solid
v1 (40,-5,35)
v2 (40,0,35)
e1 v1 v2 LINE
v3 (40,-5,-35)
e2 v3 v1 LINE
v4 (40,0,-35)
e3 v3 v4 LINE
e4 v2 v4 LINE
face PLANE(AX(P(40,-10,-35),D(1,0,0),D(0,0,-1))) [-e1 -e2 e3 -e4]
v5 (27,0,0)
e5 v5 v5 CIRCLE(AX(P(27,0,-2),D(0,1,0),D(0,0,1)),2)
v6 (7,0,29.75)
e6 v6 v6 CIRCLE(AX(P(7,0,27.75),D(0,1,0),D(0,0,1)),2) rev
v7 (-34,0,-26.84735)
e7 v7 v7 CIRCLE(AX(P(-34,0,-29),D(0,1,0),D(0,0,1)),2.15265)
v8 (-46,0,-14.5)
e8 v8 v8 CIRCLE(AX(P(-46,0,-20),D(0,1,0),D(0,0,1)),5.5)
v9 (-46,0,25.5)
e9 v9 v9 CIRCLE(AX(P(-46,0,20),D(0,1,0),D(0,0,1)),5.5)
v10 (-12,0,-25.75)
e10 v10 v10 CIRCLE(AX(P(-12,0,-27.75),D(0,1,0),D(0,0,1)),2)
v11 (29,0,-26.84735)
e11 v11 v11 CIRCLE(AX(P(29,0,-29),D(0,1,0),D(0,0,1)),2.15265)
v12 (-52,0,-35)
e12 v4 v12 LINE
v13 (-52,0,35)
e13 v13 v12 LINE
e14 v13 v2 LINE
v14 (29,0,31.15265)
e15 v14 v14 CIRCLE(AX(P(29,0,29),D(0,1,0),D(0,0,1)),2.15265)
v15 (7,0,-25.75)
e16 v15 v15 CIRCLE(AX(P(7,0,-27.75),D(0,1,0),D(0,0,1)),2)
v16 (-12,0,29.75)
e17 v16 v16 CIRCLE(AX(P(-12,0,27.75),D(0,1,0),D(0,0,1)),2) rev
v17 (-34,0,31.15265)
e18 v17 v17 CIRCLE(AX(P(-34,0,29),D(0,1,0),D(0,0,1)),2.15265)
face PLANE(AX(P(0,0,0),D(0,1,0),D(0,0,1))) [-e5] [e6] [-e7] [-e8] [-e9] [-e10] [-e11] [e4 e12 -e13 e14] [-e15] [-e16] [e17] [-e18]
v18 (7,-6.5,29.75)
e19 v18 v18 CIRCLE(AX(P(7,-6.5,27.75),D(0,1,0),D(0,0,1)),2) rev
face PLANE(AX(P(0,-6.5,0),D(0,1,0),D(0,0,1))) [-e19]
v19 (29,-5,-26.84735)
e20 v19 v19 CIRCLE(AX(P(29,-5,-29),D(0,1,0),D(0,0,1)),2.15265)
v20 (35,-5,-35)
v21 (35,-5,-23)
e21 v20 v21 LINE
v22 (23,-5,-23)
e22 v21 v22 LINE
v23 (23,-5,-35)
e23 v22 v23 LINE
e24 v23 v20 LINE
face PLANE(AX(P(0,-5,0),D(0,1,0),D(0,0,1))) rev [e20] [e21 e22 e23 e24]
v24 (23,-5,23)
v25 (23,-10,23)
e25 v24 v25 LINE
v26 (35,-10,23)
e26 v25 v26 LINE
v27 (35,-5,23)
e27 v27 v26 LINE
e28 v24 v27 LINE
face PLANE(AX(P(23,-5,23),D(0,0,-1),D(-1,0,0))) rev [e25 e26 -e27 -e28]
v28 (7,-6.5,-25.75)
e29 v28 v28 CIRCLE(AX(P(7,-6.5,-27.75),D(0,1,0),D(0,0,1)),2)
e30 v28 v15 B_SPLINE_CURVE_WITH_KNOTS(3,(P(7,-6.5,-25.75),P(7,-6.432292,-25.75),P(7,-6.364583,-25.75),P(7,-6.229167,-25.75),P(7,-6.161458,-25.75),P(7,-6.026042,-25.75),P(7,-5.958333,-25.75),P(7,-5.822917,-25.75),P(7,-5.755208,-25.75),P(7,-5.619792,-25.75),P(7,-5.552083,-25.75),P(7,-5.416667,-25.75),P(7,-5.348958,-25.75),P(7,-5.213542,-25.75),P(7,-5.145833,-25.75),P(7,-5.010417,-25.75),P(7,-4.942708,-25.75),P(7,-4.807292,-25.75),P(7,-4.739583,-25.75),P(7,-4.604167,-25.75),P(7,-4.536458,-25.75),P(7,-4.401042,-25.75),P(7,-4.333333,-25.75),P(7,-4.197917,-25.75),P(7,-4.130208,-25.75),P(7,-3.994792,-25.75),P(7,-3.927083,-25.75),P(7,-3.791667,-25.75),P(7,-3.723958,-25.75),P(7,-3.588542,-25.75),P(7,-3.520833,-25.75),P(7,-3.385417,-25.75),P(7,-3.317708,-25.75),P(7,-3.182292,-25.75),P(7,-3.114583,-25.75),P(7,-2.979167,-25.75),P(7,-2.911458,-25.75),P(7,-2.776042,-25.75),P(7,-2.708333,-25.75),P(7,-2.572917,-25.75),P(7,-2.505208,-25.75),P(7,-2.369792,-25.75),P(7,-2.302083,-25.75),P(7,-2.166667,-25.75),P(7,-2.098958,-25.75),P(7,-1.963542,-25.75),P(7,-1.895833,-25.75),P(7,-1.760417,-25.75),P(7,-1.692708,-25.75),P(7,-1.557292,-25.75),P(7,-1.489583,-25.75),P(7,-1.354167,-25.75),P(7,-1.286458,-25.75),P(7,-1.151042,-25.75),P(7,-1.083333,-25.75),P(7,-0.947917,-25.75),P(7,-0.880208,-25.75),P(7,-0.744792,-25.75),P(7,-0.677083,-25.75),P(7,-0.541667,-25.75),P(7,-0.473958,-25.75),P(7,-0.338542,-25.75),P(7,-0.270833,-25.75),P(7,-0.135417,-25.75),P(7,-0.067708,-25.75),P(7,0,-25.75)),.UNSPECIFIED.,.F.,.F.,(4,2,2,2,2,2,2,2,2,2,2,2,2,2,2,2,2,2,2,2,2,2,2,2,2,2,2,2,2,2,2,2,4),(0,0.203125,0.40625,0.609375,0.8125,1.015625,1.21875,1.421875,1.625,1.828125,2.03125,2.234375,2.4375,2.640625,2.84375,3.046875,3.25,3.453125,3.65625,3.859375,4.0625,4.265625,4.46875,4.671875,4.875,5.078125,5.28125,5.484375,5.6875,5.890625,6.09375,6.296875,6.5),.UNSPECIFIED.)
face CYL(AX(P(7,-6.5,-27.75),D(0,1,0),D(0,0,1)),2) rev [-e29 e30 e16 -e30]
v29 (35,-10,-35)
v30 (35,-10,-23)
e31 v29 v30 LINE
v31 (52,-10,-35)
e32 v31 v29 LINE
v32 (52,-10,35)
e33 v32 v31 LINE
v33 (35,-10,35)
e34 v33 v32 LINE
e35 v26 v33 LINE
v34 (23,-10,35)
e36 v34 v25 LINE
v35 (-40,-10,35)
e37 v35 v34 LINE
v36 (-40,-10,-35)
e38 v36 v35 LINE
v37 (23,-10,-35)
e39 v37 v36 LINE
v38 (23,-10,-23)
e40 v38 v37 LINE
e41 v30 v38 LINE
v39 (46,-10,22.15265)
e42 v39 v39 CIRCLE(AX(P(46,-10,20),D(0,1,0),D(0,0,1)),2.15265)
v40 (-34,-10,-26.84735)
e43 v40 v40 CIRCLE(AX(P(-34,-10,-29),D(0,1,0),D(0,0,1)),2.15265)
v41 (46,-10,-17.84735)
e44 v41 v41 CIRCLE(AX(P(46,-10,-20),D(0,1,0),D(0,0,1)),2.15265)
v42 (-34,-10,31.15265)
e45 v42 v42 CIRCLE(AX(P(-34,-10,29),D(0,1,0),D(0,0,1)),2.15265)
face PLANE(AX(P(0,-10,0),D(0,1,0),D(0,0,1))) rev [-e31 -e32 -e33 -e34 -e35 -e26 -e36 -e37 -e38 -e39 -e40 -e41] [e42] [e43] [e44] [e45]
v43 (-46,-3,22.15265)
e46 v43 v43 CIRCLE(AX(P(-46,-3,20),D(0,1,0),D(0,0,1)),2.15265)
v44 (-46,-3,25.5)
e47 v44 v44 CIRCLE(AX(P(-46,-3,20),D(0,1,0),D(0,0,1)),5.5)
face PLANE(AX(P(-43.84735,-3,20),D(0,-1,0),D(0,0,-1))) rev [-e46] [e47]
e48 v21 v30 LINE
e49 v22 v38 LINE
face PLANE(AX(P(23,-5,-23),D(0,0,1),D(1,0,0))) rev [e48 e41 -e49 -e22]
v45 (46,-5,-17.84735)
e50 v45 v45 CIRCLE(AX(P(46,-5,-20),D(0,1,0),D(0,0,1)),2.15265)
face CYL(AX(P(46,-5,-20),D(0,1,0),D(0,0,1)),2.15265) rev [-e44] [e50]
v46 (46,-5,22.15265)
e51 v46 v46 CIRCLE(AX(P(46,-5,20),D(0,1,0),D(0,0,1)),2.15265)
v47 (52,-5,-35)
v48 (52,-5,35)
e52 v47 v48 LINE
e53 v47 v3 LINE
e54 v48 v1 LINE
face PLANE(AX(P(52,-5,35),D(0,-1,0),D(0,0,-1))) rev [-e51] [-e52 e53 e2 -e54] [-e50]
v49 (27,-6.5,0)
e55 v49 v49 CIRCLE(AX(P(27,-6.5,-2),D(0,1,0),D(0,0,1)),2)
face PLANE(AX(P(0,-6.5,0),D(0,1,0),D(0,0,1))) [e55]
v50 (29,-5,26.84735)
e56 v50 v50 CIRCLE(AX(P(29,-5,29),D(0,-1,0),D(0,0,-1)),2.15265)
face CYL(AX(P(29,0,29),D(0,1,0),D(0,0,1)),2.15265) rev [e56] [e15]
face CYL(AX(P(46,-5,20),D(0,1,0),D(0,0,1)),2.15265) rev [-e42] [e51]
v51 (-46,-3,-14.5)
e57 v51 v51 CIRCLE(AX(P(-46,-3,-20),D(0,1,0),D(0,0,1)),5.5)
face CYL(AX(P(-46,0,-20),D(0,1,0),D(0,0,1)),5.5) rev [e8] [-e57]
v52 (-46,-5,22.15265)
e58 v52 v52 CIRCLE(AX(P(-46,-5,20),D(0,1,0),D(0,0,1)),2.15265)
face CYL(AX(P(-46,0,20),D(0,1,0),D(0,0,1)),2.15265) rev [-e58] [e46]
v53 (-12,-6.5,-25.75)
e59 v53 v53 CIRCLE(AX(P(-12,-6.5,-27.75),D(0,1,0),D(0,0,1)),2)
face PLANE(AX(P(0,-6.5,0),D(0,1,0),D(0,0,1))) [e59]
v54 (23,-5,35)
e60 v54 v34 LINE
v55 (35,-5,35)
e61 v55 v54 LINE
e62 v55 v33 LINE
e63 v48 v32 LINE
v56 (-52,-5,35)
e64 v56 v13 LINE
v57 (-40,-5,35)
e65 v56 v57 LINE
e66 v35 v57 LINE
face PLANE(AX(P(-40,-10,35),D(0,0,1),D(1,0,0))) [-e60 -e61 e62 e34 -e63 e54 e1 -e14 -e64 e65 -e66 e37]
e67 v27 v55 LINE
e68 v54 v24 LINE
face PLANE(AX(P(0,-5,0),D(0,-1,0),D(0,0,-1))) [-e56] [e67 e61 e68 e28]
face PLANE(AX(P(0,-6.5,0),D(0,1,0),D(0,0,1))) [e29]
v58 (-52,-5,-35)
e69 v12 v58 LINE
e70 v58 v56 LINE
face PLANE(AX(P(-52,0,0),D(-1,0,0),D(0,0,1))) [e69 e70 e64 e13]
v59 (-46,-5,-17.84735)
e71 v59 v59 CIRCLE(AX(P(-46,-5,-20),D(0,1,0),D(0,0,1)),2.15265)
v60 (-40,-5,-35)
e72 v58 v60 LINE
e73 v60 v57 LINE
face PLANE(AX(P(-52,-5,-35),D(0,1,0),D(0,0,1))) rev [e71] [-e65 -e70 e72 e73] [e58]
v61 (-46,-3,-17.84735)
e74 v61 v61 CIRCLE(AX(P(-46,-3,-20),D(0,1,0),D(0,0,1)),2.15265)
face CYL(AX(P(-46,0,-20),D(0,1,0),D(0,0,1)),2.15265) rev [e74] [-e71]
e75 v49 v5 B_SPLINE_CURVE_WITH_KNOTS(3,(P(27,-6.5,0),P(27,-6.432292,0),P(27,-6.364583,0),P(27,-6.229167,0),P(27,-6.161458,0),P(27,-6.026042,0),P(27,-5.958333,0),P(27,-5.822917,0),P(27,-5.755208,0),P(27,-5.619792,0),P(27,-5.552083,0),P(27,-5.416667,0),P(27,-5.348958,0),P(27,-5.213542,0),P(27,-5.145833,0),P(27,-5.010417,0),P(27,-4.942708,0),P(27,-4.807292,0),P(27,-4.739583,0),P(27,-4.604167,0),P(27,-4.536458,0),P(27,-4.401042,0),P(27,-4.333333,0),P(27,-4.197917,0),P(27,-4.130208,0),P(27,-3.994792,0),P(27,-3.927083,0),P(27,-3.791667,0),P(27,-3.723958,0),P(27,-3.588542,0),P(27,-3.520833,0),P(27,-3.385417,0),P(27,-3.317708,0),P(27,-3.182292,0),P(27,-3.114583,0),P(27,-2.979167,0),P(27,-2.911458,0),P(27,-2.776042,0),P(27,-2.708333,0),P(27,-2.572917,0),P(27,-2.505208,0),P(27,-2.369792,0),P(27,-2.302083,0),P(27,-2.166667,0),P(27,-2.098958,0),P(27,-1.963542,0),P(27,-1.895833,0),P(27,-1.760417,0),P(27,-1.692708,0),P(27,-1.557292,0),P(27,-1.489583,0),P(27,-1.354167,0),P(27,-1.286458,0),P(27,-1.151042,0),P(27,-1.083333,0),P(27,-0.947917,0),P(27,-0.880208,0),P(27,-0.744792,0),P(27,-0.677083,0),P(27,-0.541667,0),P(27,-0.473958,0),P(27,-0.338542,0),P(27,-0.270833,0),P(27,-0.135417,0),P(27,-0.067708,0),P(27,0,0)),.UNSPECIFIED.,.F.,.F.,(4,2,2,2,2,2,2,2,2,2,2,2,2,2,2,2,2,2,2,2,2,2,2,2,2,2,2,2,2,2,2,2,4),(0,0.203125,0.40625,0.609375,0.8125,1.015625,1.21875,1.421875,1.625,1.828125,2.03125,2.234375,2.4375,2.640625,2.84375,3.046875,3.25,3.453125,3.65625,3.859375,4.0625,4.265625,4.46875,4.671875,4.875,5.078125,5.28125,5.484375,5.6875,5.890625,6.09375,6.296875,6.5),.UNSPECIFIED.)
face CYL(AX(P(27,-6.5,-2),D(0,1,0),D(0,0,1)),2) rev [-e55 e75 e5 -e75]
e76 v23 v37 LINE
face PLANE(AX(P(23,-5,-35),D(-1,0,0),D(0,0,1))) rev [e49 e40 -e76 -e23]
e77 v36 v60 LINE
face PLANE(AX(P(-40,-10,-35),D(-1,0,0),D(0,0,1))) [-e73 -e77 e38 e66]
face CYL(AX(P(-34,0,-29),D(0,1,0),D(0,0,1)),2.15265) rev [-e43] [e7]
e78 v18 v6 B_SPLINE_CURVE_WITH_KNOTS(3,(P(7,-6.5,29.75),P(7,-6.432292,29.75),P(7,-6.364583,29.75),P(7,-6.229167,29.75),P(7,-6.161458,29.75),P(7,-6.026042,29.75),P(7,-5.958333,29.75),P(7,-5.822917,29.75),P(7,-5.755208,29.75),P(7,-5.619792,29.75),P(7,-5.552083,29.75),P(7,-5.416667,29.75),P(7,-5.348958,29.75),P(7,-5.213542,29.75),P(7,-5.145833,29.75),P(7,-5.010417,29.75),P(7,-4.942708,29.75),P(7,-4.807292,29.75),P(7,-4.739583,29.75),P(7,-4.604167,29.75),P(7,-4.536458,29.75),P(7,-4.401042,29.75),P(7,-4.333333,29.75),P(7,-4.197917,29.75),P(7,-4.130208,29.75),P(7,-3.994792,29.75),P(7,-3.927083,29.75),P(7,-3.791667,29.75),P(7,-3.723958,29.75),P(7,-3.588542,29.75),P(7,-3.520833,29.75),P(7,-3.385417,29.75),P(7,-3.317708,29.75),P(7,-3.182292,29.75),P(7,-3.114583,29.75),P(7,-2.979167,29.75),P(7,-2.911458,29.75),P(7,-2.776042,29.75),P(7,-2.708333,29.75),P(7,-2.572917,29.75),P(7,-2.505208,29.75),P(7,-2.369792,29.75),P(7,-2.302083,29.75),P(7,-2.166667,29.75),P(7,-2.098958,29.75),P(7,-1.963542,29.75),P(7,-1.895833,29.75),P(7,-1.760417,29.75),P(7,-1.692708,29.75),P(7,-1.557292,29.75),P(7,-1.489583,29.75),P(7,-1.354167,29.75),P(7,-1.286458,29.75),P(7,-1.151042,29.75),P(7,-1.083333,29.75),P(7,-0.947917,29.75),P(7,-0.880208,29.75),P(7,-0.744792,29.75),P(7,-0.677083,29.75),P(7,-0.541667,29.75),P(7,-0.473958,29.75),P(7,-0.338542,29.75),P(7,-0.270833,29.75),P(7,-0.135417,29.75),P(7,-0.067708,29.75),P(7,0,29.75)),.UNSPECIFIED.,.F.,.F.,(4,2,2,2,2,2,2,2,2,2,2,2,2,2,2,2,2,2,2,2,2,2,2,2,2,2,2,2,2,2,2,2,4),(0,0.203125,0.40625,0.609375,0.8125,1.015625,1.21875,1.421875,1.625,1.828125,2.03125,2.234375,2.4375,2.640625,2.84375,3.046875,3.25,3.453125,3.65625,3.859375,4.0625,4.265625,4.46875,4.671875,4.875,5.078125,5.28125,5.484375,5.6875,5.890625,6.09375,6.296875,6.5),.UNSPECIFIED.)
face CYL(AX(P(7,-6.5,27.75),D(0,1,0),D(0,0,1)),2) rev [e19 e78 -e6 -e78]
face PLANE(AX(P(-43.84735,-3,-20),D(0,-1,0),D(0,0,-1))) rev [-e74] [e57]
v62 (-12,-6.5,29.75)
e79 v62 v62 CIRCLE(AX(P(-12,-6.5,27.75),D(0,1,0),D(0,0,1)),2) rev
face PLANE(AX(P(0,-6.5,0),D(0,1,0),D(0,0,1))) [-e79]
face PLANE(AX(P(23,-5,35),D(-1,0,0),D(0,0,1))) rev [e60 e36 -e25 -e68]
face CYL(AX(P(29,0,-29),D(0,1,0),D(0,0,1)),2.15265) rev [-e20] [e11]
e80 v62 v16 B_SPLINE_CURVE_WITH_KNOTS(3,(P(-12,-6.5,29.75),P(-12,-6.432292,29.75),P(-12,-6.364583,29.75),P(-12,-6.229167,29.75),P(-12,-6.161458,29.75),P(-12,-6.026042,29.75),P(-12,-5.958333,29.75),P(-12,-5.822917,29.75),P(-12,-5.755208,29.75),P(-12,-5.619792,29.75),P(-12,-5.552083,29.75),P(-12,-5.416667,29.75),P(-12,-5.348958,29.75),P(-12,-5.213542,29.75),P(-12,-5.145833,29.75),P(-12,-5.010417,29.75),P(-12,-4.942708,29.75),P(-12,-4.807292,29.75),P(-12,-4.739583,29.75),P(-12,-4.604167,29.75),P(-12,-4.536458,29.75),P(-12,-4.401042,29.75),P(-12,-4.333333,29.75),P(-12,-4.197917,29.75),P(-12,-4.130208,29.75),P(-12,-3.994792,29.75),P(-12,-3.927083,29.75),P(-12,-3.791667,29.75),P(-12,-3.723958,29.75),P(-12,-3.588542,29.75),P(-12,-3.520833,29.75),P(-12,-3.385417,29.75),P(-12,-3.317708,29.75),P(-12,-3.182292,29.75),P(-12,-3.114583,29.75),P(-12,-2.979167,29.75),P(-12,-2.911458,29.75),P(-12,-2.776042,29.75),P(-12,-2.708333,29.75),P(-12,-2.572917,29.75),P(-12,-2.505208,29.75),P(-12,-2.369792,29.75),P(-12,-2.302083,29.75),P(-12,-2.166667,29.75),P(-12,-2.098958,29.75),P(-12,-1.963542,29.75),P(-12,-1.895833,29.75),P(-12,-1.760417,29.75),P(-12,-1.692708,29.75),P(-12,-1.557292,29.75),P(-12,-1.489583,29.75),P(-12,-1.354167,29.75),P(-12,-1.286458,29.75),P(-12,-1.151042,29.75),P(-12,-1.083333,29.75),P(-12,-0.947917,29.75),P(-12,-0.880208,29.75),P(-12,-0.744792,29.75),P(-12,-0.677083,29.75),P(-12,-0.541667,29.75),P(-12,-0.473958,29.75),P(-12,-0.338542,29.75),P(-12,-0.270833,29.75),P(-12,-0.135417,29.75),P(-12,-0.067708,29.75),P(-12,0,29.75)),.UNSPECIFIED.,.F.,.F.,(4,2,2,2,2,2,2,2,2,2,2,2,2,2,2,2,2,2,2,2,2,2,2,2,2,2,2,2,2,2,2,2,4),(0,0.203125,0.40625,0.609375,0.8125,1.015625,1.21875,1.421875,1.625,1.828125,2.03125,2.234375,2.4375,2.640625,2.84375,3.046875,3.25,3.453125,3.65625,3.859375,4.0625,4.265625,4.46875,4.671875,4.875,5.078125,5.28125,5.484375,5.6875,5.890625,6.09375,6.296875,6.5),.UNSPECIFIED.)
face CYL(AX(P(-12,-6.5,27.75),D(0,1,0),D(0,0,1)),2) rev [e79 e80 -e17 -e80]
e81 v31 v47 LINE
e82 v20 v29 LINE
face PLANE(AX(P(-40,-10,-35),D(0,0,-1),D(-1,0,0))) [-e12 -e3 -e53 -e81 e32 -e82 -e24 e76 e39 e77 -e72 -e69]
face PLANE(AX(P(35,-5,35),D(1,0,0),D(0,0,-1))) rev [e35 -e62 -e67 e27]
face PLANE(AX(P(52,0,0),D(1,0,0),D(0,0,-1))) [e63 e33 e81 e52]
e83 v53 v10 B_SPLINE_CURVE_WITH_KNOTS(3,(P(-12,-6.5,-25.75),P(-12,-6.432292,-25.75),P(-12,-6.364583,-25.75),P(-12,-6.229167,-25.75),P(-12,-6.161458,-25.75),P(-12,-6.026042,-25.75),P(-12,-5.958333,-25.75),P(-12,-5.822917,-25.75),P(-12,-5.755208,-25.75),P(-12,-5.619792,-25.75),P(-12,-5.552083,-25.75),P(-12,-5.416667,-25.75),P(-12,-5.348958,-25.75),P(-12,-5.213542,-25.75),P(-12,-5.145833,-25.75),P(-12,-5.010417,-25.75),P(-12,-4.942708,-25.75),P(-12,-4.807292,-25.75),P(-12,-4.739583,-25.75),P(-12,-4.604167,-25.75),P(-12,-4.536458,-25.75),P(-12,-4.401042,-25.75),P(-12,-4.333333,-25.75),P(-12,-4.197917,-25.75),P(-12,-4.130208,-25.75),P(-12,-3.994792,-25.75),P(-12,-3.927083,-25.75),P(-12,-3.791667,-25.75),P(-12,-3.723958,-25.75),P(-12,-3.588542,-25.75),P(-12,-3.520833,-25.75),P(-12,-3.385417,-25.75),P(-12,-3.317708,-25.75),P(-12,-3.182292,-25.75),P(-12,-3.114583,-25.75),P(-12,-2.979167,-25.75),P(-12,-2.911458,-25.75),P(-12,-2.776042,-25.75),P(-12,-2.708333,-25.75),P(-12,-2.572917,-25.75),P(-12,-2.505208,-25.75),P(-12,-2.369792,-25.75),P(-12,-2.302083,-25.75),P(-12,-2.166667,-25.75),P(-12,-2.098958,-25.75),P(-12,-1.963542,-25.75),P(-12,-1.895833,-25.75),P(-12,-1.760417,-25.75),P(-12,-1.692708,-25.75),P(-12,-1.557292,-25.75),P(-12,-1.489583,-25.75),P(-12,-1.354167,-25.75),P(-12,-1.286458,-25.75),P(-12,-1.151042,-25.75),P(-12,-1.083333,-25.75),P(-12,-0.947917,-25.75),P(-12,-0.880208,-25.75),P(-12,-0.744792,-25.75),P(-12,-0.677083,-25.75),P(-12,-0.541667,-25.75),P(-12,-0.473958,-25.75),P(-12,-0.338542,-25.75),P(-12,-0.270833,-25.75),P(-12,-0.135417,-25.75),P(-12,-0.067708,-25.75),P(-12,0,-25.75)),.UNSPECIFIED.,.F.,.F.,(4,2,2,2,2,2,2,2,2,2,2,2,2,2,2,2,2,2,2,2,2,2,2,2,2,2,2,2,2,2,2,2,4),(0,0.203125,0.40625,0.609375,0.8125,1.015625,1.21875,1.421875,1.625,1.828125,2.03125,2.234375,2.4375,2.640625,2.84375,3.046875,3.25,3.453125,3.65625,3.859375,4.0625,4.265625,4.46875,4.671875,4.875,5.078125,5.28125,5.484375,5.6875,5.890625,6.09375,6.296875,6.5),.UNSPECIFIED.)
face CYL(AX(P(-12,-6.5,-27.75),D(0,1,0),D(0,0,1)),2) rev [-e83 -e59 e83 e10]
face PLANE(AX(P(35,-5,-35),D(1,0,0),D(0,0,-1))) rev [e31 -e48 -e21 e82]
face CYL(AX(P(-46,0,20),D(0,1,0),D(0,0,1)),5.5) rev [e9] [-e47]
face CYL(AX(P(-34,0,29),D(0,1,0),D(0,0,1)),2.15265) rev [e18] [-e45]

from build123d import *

# Parameters (mm, degrees)
BOSS_STRUCTURE_START                            = -40
BOSS_STRUCTURE_OUTLINE_W                        = 10
BOSS_STRUCTURE_OUTLINE_H                        = 70
BOSS_STRUCTURE_DEPTH                            = 80
SKETCH3_W                                       = 70
SKETCH3_H                                       = 5
BOSS_ATTACHE_AVANT_DEPTH                        = 12
SKETCH4_W                                       = 70
SKETCH4_H                                       = 5
BOSS_ATTACHE_ARRI_RE_DEPTH                      = 12
CBORE_FOR_6_PAN_HEAD_MACHINE_SCREW1_D           = 4.3053
CBORE_FOR_6_PAN_HEAD_MACHINE_SCREW1_CBORE_D     = 11.000000098
CBORE_FOR_6_PAN_HEAD_MACHINE_SCREW1_CBORE_DEPTH = 3.000000096
F_6_CLEARANCE_HOLE1_D                           = 4.3053
SKETCH10_W                                      = 12
SKETCH10_H                                      = 12
CUT_SUPPORT_LAT_DEPTH                           = 5
F_6_CLEARANCE_HOLE2_D                           = 4.3053
F_6_CLEARANCE_HOLE2_DEPTH                       = 10
BOARD_R                                         = 2
CUT_EXTRUDE2_DEPTH                              = 6.5


# Read off the part's stored shape, not the designer's step: Boss-Structure
with BuildPart() as part:
    # Boss-Structure outline → Boss-Structure (new body)
    with BuildSketch(Plane.YZ.offset(BOSS_STRUCTURE_START)):
        with Locations((-5, 0)):
            Rectangle(BOSS_STRUCTURE_OUTLINE_W, BOSS_STRUCTURE_OUTLINE_H)
    extrude(amount=BOSS_STRUCTURE_DEPTH)

    # Sketch3 → Boss-Attache avant (add)
    with BuildSketch(Plane.ZY.offset(40)):
        with Locations((0, -2.5)):
            Rectangle(SKETCH3_W, SKETCH3_H)
    extrude(amount=BOSS_ATTACHE_AVANT_DEPTH)

    # Sketch4 → Boss-Attache arrière (add)
    with BuildSketch(Plane(origin=(40, 0, 0), x_dir=(0, 0, -1), z_dir=(1, 0, 0))):
        with Locations((0, -7.5)):
            Rectangle(SKETCH4_W, SKETCH4_H)
    extrude(amount=BOSS_ATTACHE_ARRI_RE_DEPTH)

    # CBORE for #6 Pan Head Machine Screw1 (through all)
    with Locations(Plane(origin=(0, 0, 0), x_dir=(1, 0, 0), z_dir=(0, 1, 0))):
        with Locations((-46, 20), (-46, -20)):
            CounterBoreHole(CBORE_FOR_6_PAN_HEAD_MACHINE_SCREW1_D / 2, CBORE_FOR_6_PAN_HEAD_MACHINE_SCREW1_CBORE_D / 2, CBORE_FOR_6_PAN_HEAD_MACHINE_SCREW1_CBORE_DEPTH)

    # #6 Clearance Hole1 (through all)
    with Locations(Plane(origin=(0, -5, 0), x_dir=(1, 0, 0), z_dir=(0, 1, 0))):
        with Locations((46, 20), (46, -20)):
            Hole(F_6_CLEARANCE_HOLE1_D / 2)

    # Sketch10 → Cut-Support lat (cut)
    with BuildSketch(Plane.XZ.offset(10)):
        with Locations((29, 29)):
            Rectangle(SKETCH10_W, SKETCH10_H)
        with Locations((29, -29)):
            Rectangle(SKETCH10_W, SKETCH10_H)
    extrude(amount=-CUT_SUPPORT_LAT_DEPTH, mode=Mode.SUBTRACT)

    # #6 Clearance Hole2
    with Locations(Plane(origin=(0, 0, 0), x_dir=(1, 0, 0), z_dir=(0, 1, 0))):
        with Locations((-34, 29), (-34, -29), (29, -29), (29, 29)):
            Hole(F_6_CLEARANCE_HOLE2_D / 2, depth=F_6_CLEARANCE_HOLE2_DEPTH)

    # Board → Cut-Extrude2 (cut)
    with BuildSketch(Plane(origin=(0, 0, 0), x_dir=(1, 0, 0), z_dir=(0, 1, 0))):
        with Locations(Location((-12, 27.75, 0), (0, 0, 270))):
            Circle(BOARD_R)
        with Locations(Location((7, 27.75, 0), (0, 0, 270))):
            Circle(BOARD_R)
        with Locations(Location((-12, -27.75, 0), (0, 0, 270))):
            Circle(BOARD_R)
        with Locations(Location((7, -27.75, 0), (0, 0, 270))):
            Circle(BOARD_R)
        with Locations(Location((27, 2, 0), (0, 0, 270))):
            Circle(BOARD_R)
    extrude(amount=-CUT_EXTRUDE2_DEPTH, mode=Mode.SUBTRACT)


solid = part.part
